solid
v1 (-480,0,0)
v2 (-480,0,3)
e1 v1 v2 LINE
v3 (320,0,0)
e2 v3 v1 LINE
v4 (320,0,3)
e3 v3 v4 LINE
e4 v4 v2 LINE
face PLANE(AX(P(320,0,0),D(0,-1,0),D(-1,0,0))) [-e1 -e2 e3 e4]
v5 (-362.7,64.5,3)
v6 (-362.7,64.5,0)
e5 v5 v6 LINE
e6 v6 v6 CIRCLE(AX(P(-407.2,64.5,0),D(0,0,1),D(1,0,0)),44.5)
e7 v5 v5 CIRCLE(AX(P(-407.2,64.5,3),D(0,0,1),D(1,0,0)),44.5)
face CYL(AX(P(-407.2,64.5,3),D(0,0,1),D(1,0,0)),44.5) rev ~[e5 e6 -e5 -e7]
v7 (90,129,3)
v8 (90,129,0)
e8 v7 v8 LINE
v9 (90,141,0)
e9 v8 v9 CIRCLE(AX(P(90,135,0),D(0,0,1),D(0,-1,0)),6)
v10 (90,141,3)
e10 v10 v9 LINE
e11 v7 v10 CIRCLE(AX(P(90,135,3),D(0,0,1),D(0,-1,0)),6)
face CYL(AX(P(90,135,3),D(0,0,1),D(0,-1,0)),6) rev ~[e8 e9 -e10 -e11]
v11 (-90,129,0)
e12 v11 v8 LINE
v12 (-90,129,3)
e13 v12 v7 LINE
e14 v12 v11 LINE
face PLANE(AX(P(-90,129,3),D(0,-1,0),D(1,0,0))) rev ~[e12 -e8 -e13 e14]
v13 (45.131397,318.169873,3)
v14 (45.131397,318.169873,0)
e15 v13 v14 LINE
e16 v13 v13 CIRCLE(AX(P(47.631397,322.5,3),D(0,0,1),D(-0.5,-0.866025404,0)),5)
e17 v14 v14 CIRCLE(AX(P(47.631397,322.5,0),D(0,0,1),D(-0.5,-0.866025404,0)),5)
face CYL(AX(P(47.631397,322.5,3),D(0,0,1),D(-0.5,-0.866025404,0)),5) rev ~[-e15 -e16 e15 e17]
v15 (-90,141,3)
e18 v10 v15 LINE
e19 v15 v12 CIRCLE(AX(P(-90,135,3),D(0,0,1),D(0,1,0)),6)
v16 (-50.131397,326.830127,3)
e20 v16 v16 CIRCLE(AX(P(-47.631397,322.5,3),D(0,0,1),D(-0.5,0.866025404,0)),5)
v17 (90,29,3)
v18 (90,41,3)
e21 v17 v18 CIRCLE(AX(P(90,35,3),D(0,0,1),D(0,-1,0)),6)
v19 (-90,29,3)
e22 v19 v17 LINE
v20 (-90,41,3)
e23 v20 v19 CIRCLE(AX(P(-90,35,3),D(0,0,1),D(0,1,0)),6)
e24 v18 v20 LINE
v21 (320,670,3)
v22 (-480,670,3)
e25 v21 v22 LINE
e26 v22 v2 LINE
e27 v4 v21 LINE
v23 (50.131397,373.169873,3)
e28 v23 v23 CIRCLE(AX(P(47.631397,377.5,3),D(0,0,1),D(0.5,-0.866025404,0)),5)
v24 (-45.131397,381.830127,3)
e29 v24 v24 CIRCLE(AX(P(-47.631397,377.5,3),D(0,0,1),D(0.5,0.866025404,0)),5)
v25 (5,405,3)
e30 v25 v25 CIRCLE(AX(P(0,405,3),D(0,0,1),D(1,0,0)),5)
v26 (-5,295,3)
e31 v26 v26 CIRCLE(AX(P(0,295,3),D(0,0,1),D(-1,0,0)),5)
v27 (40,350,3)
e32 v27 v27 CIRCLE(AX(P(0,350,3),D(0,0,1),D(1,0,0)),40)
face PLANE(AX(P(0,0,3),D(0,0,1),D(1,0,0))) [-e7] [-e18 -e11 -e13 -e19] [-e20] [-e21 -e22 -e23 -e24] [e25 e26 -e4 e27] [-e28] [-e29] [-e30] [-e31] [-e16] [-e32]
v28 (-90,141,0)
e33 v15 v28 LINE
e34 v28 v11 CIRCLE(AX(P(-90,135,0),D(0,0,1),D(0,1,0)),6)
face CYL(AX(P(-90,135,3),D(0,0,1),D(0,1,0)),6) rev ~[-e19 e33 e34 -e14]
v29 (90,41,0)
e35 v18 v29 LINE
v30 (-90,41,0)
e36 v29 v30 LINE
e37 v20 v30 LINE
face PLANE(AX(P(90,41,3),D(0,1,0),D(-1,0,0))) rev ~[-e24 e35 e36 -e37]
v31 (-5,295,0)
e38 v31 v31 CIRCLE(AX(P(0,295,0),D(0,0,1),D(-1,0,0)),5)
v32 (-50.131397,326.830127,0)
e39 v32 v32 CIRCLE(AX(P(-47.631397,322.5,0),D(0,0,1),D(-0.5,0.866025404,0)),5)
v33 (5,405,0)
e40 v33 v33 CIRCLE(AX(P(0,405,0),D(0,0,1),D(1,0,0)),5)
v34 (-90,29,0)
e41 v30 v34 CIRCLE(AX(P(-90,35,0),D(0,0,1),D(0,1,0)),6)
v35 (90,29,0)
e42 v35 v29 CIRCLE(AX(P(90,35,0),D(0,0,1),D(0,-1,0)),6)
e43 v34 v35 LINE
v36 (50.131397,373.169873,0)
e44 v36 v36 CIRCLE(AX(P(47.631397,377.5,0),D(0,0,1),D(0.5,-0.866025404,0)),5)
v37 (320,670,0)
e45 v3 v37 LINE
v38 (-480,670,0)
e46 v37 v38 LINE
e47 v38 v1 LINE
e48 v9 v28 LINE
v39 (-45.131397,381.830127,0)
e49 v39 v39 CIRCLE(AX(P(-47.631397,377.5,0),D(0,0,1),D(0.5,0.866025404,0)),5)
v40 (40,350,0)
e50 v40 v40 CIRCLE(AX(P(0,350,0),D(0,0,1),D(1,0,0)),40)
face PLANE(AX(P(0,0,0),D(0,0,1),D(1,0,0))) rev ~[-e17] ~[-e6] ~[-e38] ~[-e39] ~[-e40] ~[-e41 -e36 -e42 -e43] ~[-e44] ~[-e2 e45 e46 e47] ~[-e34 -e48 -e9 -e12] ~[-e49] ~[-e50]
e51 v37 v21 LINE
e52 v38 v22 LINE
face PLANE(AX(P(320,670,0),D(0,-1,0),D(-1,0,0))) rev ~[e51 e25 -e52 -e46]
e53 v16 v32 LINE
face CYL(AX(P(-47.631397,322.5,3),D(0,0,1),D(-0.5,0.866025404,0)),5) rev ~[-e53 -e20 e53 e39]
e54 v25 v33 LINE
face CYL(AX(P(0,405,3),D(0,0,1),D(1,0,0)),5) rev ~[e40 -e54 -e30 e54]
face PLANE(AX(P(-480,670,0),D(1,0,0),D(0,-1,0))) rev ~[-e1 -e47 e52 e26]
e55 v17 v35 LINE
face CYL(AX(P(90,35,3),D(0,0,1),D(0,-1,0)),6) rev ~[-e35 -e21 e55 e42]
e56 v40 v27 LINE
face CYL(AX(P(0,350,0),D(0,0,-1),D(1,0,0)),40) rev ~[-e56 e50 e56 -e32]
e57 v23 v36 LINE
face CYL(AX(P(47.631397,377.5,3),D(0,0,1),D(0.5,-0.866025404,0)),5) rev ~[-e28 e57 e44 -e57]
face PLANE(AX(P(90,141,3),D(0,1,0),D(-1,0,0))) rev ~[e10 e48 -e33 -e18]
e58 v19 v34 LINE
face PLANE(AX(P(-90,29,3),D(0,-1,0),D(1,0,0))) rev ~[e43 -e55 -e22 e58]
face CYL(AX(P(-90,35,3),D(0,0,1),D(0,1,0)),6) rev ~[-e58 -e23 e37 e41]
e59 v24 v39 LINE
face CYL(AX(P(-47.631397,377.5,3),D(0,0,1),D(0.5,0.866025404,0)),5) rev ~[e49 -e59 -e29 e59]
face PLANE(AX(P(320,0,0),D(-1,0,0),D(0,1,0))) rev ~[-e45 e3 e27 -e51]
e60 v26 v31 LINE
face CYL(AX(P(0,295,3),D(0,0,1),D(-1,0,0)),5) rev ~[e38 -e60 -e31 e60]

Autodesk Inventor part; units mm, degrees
ref_plane "YZ Plane" through (0, 0, 0) normal (1, 0, 0) x (0, 1, 0)
ref_plane "XZ Plane" through (0, 0, 0) normal (0, 1, 0) x (-1, 0, 0)
ref_plane "XY Plane" through (0, 0, 0) normal (0, 0, 1) x (1, 0, 0)
sketch "Sketch1" plane through (0, 0, 0) normal (0, 0, 1) x (1, 0, 0)
  line L0 (320, 0) -> (320, 670)
  line L1 (320, 670) -> (-480, 670)
  line L2 (-480, 670) -> (-480, 0)
  circle A0 centre (0, 350) radius 40
  line L3 (320, 0) -> (-480, 0)
  point P0 (0, 0)
  dimension "d14" = 80
  dimension "d15" = 320
  dimension "d17" = 320
  dimension "d26" = 800
  dimension "d27" = 670
extrude "Plate1" add sketch "Sketch1" along normal blind 3
sketch "Sketch3" plane through (0, 0, 3) normal (0, 0, 1) x (1, 0, 0)
  circle A0 centre (0, 405) radius 5
  circle A1 centre (0, 350) radius 40 projected
  point P0 (0, 0)
  dimension "d19" = 10
  dimension "d20" = 55
extrude "Cut1" cut sketch "Sketch3" against normal through all contours A0
pattern_circular "Circular Pattern1" count 6 over 360 about axis through (0, 350, 0) along (0, 0, 1) of "Cut1"
sketch "Sketch4" plane through (0, 0, 3) normal (0, 0, 1) x (1, 0, 0)
  line L0 (100, 650) -> (300, 650) construction
  line L1 (300, 650) -> (300, 630) construction
  line L2 (300, 630) -> (100, 630) construction
  line L3 (100, 630) -> (100, 650) construction
  line L4 (-480, 670) -> (320, 670) projected
  line L5 (320, 670) -> (320, 0) projected
  point P0 (0, 0)
  dimension "d28" = 200
  dimension "d29" = 20
  dimension "d30" = 20
  dimension "d31" = 20
mark "Mark2"
sketch "Sketch5" plane through (-480, 670, 3) normal (0, 0, 1) x (1, 0, 0)
  circle A0 centre (72.8, -605.5) radius 44.5
  line L0 (0, -670) -> (0, 0) projected
  line L1 (800, -670) -> (0, -670) projected
  dimension "d32" = 72.8
  dimension "d33" = 89
  dimension "d34" = 64.5
extrude "Extrusion1" cut sketch "Sketch5" against normal through all
sketch "Sketch6" plane through (-480, 670, 3) normal (0, 0, 1) x (1, 0, 0)
  circle A0 centre (480, -320) radius 40 projected
  line L0 (480, -320) -> (480, -670) construction
  line L1 (0, -670) -> (800, -670) projected
  line L2 (390, -535) -> (570, -535) construction
  line L3 (390, -541) -> (570, -541)
  line L4 (570, -529) -> (390, -529)
  arc A1 (390, -529) -> (390, -541) centre (390, -535) ccw
  arc A2 (570, -541) -> (570, -529) centre (570, -535) ccw
  line L5 (390, -635) -> (570, -635) construction
  line L6 (390, -641) -> (570, -641)
  line L7 (570, -629) -> (390, -629)
  arc A3 (390, -629) -> (390, -641) centre (390, -635) ccw
  arc A4 (570, -641) -> (570, -629) centre (570, -635) ccw
  line L8 (480, -535) -> (480, -635) construction
  line L9 (366, -515) -> (594, -515) construction
  line L10 (594, -515) -> (594, -655) construction
  line L11 (594, -655) -> (366, -655) construction
  line L12 (366, -655) -> (366, -515) construction
  line L13 (366, -515) -> (594, -655) construction
  circle A5 centre (366, -515) radius 2.5
  line L14 (442, -515) -> (442, -655) construction
  line L15 (518, -515) -> (518, -655) construction
  circle A6 centre (442, -515) radius 2.5
  circle A7 centre (518, -515) radius 2.5
  circle A8 centre (594, -515) radius 2.5
  circle A9 centre (594, -585) radius 2.5
  circle A10 centre (594, -655) radius 2.5
  circle A11 centre (518, -655) radius 2.5
  circle A12 centre (442, -655) radius 2.5
  circle A13 centre (366, -655) radius 2.5
  circle A14 centre (366, -585) radius 2.5
  point P0 (480, -585)
  dimension "d37" = 180
  dimension "d38" = 12
  dimension "d41" = 100
  dimension "d42" = 85
  dimension "d43" = 228
  dimension "d45" = 5
  dimension "d46" = 140
  dimension "d47" = 76
  dimension "d48" = 76
extrude "Extrusion2" cut sketch "Sketch6" against normal through all contours A1 L4 A2 L3 | A3 L7 A4 L6
equation "\"d2\" = Thickness"
equation "\"BendReliefWidth\" = Thickness"
equation "\"BendReliefDepth\" = 0.5 * Thickness"
equation "\"CornerReliefSize\" = 4 * Thickness"
equation "\"MinimumRemnant\" = 2 * Thickness"
equation "\"TransitionRadius\" = BendRadius"
equation "\"JacobiRadiusSize\" = BendRadius"
equation "\"GapSize\" = Thickness"
equation "\"Thickness\" = 3"
equation "\"BendRadius\" = 2.75"
properties part number "TRM 016 right board main++" material "AISI 304"
